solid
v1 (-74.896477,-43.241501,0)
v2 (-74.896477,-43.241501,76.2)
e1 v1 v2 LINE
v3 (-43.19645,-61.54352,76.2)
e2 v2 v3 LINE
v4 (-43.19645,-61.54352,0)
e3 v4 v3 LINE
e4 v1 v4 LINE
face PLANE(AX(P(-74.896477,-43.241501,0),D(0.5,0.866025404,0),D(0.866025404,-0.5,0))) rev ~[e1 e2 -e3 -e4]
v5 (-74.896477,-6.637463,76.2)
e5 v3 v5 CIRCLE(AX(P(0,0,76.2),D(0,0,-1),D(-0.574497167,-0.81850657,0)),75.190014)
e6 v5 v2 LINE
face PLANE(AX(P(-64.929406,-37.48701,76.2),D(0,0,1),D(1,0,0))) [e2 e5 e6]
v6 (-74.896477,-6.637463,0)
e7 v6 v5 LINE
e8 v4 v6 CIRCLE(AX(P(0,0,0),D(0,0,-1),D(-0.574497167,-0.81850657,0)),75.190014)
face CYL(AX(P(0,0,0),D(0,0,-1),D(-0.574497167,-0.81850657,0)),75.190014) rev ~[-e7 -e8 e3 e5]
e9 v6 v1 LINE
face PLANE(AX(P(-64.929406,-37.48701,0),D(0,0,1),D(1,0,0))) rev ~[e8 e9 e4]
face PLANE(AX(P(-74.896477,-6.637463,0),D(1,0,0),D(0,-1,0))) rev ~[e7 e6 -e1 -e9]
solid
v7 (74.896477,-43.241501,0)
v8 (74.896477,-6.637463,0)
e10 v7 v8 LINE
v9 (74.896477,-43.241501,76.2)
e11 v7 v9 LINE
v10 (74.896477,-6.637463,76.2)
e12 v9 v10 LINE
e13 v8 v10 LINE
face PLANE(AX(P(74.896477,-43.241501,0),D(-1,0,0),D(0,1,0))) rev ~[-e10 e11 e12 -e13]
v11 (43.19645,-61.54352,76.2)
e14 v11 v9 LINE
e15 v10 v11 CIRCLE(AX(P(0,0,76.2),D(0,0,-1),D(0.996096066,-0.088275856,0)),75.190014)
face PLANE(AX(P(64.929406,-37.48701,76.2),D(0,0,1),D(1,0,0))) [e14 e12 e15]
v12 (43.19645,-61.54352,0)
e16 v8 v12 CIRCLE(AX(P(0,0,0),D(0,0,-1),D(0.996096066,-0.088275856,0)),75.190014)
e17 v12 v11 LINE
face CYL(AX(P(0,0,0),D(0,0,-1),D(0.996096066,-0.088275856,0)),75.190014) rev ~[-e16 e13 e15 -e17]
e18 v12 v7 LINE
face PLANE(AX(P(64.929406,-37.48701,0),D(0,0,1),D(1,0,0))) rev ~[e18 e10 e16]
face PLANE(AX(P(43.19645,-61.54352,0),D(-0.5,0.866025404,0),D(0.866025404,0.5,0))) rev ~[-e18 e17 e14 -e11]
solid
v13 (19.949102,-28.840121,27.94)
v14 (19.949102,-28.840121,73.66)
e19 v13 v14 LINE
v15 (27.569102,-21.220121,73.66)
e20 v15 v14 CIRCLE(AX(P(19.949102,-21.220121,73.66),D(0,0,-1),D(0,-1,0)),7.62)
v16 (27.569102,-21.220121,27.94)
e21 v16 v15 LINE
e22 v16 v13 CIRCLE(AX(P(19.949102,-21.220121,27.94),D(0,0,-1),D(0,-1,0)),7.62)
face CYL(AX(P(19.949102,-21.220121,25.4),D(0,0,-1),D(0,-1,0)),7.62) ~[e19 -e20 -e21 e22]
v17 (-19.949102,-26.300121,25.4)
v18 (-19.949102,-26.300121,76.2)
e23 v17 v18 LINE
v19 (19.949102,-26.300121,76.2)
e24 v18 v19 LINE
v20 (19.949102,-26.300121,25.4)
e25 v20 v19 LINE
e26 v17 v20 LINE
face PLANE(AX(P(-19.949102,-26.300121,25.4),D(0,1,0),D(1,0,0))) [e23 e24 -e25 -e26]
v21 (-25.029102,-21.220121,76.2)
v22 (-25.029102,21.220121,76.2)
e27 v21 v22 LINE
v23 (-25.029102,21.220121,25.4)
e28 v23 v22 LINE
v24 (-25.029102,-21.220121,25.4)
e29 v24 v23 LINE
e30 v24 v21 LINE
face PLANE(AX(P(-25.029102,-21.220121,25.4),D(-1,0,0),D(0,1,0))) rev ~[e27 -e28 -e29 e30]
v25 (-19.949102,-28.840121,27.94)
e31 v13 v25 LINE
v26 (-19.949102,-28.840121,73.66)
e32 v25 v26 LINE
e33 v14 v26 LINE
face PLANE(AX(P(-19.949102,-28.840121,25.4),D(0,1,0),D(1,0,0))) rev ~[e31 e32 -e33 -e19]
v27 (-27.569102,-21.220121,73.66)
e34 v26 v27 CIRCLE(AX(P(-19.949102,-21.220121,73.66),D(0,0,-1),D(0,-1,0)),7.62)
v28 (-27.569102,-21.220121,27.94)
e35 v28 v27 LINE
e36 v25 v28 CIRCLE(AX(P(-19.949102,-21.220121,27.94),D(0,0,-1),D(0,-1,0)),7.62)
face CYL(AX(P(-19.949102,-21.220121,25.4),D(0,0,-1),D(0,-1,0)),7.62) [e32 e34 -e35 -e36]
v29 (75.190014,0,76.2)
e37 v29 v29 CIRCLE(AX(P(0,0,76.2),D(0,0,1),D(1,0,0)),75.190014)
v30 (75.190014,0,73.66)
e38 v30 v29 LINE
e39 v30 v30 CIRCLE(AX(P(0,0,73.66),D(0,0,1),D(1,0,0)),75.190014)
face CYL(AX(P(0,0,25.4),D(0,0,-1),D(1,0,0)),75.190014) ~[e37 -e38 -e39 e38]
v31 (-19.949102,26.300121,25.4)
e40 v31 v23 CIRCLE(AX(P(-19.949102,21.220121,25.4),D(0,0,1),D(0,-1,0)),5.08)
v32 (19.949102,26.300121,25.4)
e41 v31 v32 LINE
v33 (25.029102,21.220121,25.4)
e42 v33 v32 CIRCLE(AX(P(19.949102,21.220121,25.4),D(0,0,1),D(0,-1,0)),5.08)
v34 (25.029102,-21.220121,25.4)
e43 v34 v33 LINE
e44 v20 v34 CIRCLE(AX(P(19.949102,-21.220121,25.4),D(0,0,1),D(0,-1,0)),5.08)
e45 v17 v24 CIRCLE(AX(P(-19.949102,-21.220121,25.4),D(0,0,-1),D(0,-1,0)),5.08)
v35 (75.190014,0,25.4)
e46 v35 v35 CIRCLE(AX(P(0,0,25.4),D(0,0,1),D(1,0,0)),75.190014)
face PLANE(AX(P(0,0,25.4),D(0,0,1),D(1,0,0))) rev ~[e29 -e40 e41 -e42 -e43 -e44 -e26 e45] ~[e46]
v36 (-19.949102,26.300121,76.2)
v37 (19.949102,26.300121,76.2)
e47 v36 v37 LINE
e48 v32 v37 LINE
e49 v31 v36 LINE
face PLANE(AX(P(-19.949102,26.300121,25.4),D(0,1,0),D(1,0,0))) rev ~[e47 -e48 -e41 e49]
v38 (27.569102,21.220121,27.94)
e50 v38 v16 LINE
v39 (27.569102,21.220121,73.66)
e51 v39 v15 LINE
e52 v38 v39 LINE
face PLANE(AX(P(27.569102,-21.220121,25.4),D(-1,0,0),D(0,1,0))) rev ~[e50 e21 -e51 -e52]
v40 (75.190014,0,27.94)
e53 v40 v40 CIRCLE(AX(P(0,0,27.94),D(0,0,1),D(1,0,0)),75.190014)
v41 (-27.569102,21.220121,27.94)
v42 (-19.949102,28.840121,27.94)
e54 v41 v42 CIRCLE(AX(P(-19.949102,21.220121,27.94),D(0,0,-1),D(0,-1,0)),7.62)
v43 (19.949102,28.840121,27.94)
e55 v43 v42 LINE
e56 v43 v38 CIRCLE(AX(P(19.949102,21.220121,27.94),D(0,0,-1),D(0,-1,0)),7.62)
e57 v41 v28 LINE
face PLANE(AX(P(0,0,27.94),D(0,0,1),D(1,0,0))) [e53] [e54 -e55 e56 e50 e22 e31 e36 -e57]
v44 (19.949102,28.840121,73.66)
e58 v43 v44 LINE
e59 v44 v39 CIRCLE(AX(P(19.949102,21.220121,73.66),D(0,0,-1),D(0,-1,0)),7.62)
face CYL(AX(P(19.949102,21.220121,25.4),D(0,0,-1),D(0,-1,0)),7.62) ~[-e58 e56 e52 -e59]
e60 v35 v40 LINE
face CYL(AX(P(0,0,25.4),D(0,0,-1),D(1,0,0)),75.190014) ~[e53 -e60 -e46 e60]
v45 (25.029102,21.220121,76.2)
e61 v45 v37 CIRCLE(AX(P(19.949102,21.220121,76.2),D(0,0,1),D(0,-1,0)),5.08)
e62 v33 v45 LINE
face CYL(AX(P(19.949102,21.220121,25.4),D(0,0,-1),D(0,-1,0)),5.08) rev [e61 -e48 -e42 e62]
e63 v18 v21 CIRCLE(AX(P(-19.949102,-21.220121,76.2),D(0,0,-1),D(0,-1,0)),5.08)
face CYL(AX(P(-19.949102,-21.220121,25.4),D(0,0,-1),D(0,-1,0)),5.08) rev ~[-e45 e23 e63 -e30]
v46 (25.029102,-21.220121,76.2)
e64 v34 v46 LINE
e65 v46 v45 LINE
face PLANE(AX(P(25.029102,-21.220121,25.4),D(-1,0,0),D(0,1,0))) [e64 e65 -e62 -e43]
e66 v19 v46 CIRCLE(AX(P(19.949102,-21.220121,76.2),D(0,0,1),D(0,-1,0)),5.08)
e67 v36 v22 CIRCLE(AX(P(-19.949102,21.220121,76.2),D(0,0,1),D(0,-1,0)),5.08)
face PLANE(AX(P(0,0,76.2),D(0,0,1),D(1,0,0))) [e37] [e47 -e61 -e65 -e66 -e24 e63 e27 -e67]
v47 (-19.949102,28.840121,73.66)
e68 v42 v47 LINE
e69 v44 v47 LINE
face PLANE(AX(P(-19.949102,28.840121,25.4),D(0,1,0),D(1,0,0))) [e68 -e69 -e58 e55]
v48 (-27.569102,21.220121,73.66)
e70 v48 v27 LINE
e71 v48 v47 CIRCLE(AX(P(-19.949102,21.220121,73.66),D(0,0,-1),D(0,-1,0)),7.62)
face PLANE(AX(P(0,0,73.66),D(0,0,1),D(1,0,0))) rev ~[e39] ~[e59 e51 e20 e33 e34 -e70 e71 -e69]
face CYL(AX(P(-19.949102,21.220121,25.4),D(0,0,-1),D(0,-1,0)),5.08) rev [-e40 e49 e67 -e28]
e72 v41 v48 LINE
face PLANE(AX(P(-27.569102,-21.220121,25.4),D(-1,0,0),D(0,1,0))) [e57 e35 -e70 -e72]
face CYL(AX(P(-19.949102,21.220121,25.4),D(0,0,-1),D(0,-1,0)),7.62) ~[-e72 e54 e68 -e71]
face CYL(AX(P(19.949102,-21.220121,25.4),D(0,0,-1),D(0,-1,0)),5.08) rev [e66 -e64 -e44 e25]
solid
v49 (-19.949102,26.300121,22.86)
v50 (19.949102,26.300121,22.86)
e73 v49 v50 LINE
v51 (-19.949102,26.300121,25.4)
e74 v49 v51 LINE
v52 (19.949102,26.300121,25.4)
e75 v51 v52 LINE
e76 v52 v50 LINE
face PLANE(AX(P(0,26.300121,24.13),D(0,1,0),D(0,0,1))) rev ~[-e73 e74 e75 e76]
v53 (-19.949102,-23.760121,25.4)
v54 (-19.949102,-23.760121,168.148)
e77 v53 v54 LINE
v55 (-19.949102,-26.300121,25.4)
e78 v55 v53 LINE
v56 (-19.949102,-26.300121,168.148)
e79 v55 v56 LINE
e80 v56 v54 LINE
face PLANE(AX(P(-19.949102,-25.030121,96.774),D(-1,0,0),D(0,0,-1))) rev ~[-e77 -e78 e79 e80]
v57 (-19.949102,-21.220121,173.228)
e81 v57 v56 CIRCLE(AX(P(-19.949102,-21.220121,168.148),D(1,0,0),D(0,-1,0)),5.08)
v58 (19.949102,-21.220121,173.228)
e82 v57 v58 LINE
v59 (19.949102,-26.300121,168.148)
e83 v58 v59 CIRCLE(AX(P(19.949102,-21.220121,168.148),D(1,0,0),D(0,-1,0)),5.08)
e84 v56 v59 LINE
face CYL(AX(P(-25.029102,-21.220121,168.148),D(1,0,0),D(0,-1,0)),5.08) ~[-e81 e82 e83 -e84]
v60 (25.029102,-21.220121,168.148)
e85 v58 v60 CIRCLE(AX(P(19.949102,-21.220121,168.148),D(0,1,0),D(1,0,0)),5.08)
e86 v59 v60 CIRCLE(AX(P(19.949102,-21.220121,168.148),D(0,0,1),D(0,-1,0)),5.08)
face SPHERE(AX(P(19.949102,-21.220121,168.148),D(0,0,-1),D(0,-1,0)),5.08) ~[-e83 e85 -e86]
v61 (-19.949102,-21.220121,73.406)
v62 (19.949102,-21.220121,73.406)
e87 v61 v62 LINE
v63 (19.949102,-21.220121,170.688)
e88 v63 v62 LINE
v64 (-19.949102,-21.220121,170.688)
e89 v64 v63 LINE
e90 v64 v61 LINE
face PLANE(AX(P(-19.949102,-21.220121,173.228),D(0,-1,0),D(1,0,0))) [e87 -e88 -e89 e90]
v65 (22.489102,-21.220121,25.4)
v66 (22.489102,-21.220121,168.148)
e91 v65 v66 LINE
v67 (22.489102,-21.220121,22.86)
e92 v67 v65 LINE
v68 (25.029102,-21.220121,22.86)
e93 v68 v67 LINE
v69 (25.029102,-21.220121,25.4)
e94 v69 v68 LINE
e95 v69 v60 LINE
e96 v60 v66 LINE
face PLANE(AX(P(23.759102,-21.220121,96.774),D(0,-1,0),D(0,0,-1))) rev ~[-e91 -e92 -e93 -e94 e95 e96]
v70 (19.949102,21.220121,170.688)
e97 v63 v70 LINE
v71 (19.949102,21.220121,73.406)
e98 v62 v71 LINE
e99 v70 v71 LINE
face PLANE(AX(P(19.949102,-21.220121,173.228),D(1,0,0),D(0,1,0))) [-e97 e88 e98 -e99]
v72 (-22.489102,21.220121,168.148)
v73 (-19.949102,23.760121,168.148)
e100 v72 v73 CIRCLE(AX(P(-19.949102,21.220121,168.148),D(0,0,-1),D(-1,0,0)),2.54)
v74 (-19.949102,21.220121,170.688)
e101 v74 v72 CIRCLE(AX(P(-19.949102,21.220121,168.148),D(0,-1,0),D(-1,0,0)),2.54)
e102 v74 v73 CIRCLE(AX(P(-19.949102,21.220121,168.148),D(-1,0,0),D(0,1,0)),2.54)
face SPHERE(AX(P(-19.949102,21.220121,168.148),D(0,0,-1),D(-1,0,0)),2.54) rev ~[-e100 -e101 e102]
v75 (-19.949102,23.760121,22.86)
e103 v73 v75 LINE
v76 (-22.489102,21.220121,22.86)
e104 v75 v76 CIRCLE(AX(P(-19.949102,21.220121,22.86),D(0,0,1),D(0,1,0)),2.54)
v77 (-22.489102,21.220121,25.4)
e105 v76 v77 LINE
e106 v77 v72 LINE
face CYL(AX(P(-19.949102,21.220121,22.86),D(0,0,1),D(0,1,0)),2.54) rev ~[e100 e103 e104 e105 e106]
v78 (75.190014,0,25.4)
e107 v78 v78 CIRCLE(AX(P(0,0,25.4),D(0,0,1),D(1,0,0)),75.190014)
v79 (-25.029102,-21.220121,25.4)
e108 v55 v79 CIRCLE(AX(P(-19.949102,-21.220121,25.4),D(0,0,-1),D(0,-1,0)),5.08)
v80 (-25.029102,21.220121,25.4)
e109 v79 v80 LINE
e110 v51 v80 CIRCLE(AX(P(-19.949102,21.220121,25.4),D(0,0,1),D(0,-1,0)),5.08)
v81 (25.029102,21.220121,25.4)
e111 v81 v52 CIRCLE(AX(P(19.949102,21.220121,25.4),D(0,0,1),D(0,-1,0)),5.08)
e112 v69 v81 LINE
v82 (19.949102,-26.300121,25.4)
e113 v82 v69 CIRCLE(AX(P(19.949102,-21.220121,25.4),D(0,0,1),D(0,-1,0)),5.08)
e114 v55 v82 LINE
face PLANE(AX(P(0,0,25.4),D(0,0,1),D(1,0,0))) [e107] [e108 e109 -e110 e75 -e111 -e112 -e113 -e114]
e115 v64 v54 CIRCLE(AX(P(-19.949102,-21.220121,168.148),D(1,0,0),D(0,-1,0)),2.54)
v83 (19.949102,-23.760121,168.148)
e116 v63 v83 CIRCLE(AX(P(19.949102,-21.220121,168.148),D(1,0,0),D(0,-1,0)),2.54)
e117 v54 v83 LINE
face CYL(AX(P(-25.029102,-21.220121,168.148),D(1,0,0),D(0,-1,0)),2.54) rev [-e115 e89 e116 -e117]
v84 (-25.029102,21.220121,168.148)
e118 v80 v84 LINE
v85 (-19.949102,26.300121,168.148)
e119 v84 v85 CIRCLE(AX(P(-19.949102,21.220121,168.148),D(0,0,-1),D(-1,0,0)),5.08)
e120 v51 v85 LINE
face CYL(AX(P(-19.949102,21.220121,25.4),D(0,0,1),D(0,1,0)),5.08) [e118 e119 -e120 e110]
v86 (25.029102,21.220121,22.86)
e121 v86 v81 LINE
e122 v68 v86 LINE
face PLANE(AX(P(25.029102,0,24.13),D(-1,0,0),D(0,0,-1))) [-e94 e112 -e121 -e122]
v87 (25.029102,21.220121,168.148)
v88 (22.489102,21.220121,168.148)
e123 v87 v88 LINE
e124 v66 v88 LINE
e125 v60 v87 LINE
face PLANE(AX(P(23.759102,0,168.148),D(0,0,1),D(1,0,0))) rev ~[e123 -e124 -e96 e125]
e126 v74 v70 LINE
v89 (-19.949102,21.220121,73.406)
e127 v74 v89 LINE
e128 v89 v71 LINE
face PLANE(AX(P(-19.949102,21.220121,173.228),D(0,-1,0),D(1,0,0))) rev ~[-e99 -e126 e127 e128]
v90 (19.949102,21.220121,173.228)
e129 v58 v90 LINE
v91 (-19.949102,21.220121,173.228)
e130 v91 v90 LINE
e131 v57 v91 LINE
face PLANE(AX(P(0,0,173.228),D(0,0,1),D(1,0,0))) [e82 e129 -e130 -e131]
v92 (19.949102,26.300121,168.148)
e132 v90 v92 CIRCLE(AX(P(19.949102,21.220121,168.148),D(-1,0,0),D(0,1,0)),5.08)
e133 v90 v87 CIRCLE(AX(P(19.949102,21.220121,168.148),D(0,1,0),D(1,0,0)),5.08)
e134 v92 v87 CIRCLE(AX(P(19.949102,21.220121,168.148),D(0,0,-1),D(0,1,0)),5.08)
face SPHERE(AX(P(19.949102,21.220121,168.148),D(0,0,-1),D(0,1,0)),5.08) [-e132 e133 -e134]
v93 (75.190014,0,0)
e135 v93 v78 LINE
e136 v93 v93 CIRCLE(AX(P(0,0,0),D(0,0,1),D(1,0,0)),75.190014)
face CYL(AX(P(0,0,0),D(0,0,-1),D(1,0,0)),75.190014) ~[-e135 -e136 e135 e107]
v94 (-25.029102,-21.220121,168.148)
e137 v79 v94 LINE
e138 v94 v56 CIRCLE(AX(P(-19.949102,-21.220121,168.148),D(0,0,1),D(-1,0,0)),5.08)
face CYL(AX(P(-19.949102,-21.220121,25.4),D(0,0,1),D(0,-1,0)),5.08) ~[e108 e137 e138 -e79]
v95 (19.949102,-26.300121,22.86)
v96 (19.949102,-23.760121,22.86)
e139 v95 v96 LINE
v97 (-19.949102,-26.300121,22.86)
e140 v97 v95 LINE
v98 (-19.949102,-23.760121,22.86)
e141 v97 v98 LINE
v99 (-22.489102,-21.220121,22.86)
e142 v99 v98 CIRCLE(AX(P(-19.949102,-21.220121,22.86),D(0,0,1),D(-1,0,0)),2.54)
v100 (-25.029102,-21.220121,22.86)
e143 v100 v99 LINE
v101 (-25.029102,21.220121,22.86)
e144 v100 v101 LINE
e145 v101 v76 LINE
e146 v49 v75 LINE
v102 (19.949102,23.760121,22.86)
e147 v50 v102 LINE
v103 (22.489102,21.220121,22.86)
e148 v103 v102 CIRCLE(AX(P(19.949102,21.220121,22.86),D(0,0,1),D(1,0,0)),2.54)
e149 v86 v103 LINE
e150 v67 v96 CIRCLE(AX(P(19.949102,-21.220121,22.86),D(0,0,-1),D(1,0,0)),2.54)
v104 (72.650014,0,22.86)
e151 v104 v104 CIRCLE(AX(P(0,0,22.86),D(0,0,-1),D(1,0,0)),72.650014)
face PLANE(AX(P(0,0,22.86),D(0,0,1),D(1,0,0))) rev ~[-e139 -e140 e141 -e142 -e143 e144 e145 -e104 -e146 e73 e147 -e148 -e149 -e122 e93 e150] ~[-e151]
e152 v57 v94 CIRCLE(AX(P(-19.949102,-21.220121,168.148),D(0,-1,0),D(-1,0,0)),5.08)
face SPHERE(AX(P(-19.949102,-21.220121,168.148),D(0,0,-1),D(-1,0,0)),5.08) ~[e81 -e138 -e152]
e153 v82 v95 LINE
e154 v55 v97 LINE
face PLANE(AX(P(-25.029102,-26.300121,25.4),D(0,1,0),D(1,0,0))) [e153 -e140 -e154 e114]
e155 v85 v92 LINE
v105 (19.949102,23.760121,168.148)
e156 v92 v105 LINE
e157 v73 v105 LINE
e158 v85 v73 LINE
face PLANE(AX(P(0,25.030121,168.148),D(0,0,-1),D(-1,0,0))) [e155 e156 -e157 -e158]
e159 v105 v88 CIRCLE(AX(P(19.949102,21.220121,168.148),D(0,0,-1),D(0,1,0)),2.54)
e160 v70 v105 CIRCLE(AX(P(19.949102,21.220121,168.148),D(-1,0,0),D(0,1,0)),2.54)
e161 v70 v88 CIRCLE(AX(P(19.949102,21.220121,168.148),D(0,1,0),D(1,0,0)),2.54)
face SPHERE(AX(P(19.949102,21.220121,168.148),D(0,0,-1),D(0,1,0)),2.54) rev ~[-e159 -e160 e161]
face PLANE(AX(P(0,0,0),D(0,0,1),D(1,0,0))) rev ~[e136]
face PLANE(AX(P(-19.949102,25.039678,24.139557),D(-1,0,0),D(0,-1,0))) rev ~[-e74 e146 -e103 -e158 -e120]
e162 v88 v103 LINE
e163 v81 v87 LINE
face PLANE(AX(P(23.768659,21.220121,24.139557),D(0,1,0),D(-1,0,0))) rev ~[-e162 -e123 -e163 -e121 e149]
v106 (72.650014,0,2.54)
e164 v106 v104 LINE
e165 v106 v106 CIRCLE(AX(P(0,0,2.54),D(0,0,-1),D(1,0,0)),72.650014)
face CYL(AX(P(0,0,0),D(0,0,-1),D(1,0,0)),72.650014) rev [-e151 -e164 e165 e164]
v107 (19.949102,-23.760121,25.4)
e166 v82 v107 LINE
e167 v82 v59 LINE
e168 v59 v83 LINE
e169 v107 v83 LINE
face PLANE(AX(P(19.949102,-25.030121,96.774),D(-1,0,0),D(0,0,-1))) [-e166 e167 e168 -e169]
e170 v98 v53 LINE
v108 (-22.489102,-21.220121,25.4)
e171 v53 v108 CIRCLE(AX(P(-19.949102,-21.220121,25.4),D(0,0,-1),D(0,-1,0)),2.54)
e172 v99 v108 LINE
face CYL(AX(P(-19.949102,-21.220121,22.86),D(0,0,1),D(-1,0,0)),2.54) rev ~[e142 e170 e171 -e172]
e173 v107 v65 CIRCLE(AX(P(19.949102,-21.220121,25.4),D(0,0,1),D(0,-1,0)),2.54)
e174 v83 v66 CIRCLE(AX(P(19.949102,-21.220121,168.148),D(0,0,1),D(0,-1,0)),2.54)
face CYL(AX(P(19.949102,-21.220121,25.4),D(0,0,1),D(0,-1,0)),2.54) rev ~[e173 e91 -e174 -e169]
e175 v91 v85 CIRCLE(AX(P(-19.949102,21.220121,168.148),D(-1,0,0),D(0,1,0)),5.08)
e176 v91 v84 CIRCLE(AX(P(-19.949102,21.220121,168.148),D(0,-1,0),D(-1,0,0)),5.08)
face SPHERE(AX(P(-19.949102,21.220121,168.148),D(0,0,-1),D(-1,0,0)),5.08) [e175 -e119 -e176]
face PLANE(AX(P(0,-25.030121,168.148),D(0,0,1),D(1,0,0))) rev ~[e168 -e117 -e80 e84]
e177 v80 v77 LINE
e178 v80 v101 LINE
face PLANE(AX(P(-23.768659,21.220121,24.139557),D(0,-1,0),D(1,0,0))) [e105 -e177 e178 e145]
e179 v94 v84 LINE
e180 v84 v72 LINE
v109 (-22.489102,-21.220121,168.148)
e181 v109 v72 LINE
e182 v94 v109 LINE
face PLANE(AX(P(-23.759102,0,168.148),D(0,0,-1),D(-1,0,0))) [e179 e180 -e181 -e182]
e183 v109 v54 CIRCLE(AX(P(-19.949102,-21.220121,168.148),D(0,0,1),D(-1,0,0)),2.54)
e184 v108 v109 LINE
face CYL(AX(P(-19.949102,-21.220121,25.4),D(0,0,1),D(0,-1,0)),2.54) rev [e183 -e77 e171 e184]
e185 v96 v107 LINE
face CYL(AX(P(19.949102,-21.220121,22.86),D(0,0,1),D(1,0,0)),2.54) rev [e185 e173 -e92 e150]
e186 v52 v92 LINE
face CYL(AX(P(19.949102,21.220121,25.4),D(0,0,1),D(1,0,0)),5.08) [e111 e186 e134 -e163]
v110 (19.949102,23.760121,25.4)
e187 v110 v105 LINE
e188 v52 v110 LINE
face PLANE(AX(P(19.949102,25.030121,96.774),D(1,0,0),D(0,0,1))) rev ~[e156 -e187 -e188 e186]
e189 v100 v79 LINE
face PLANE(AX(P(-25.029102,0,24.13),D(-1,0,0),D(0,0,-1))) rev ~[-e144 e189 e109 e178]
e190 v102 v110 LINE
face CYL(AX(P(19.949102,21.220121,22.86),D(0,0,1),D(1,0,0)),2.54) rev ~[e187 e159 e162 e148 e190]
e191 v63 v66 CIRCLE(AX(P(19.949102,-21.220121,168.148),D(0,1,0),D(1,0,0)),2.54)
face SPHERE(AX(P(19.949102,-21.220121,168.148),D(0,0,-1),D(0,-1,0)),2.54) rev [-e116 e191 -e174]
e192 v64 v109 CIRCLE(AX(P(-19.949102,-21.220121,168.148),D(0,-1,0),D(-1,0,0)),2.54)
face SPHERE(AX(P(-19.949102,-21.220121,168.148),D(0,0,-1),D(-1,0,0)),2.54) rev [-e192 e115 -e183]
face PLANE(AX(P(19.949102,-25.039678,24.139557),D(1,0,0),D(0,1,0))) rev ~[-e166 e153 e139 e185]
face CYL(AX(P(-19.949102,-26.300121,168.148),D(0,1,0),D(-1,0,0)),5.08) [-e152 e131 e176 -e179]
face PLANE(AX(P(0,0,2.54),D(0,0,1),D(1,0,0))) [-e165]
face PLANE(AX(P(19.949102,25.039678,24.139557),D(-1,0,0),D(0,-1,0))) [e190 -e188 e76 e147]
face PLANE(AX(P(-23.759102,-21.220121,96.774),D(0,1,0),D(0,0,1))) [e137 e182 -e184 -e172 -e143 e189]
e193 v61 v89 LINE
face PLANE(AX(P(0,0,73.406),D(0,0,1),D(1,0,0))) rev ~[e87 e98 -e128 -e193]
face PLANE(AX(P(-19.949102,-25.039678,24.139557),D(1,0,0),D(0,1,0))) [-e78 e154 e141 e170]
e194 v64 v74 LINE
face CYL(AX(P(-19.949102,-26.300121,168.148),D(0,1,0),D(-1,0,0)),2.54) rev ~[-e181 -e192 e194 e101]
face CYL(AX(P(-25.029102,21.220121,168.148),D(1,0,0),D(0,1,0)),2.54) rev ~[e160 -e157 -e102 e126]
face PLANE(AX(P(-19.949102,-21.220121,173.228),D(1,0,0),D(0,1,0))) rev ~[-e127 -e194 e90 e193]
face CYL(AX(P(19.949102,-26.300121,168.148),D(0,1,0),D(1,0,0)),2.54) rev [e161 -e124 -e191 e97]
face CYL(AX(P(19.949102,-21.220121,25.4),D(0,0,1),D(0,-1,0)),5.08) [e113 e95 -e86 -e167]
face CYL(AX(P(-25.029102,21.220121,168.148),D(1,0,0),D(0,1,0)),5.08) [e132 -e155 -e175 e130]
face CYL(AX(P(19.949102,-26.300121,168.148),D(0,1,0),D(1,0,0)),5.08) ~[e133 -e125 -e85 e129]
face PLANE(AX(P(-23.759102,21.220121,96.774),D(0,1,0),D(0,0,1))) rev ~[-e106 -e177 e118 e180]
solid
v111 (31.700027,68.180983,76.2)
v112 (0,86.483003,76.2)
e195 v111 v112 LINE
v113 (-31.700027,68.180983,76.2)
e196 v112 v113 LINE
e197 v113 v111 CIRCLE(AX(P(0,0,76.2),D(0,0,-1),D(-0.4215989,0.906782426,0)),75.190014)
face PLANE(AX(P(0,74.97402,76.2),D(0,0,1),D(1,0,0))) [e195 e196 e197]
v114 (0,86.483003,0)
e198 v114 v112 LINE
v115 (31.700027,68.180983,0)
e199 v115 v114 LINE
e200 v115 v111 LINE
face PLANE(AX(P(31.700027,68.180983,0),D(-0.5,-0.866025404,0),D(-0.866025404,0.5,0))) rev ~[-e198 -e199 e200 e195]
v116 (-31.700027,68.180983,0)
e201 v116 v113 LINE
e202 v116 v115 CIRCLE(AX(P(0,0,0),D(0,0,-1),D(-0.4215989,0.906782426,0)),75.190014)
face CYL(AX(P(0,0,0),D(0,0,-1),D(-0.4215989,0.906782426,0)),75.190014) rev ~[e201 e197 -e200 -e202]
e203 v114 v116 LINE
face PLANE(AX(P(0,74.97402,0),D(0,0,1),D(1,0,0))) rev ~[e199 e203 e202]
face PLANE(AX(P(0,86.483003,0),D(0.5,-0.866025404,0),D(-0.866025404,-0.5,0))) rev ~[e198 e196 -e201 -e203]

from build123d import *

# Parameters (mm, degrees)
F2_DEPTH     = 76.2
F0_R         = 75.1900139913
F3_DEPTH     = 25.4
F4_W         = 50.0582046807
F4_H         = 52.6002421975
F5_DEPTH     = 147.828
F6_R         = 5.08
F7_DEPTH     = 50.8
F8_T         = -2.54
F9_T         = 2.54
F9_T4_ANGLE  = 90.000000001
F9_T6_ANGLE  = 90.000000001
F9_T8_ANGLE  = 90.000000001
F9_T10_ANGLE = 90.000000001
F10_DEPTH    = 99.822


# Not quite as in the source:
# - a shell that OpenCascade refuses in one call is made with other operations: the cavity is built on its own and cut out


with BuildPart() as f2:
    # F1 (on face) → F2 (new body)
    with BuildSketch(Plane.XY):
        with BuildLine():
            Line((-74.8964771628, -6.6374628139), (-74.8964771628, -43.2415012513))
            Line((-74.8964771628, -43.2415012513), (-43.1964499949, -61.5435204701))
            ThreePointArc((-43.1964499949, -61.5435204701), (-65.1164622274, -37.5950069956), (-74.8964771628, -6.6374628139))
        make_face()
    extrude(amount=F2_DEPTH)


with BuildPart() as f2b:
    # F1 (on face) → F2, piece 2 (new body)
    with BuildSketch(Plane.XY):
        with BuildLine():
            Line((0, 86.4830025026), (-31.7000271679, 68.1809832839))
            ThreePointArc((-31.7000271679, 68.1809832839), (0, 75.1900139913), (31.7000271679, 68.1809832839))
            Line((31.7000271679, 68.1809832839), (0, 86.4830025026))
        make_face()
    extrude(amount=F2_DEPTH)


with BuildPart() as f2c:
    # F1 (on face) → F2, piece 3 (new body)
    with BuildSketch(Plane.XY):
        with BuildLine():
            ThreePointArc((74.8964771628, -6.6374628139), (65.1164622274, -37.5950069956), (43.1964499949, -61.5435204701))
            Line((43.1964499949, -61.5435204701), (74.8964771628, -43.2415012513))
            Line((74.8964771628, -43.2415012513), (74.8964771628, -6.6374628139))
        make_face()
    extrude(amount=F2_DEPTH)


with BuildPart() as f3:
    # F0 (on Top) → F3 (new body)
    with BuildSketch(Plane.XY):
        Circle(F0_R)
    extrude(amount=F3_DEPTH)

    # F4 (on face) → F5 (join)
    with BuildSketch(Plane.XY.offset(25.4)):
        Rectangle(F4_W, F4_H)
    extrude(amount=F5_DEPTH)

    # F6
    f6_edges = [f3.edges().sort_by_distance(p)[0] for p in [
        (25.029102, -26.300121, 99.314),
        (25.029102, 26.300121, 99.314),
        (-25.029102, 26.300121, 99.314),
        (-25.029102, -26.300121, 99.314),
        (-25.029102, 0, 173.228),
        (0, -26.300121, 173.228),
        (0, 26.300121, 173.228),
        (25.029102, 0, 173.228),
    ]]
    fillet(f6_edges, radius=F6_R)


with BuildPart() as f7:
    # F7 (new): a face of the model
    f7_faces = [f3.part.faces().sort_by_distance(p)[0] for p in [
        (27.1557970912, 0, 25.4),
    ]]
    extrude(f7_faces, amount=F7_DEPTH)

    # F8
    f8_openings = [f7.faces().sort_by_distance(p)[0] for p in [
        (-75.190014, 0, 50.8),
    ]]
    offset(amount=F8_T, openings=f8_openings)


with BuildPart() as f3_1:
    add(f3.part)

    # F9: shell of thickness 2.54, made by hand


with BuildPart() as f9_core1:
    # F9_t2: copy of F3
    add(f3_1.part)

    # the walls: a layer under each face that stays
    f9_faces = [f9_core1.faces().sort_by_distance(p)[0] for p in [
        (-50.1266759942, -50.1266759942, 25.4),
        (23.5412047888, -24.8122235472, 96.774),
        (23.5412047888, 24.8122235472, 96.774),
        (-23.5412047888, -24.8122235472, 96.774),
        (-23.5412047888, 24.8122235472, 96.774),
        (-75.1900139913, 0, 12.7),
        (23.5412047888, 0, 171.7401024484),
        (22.4891023403, -23.7601210988, 171.7401024484),
        (22.4891023403, 23.7601210988, 171.7401024484),
        (0, -24.8122235472, 171.7401024484),
        (0, 24.8122235472, 171.7401024484),
        (-22.4891023403, -23.7601210988, 171.7401024484),
        (-22.4891023403, 23.7601210988, 171.7401024484),
        (-23.5412047888, 0, 171.7401024484),
        (0, 0, 0),
        (0, 0, 173.228),
    ]]
    thicken(f9_faces, amount=-F9_T, mode=Mode.SUBTRACT)

    # F9_s3 → F9_t4 (revolve, cut)
    with BuildSketch(Plane.XZ.offset(21.2201210988)):
        Polygon((25.0545023403, 25.4254), (25.0291023403, 22.86), (22.4891023403, 22.86), (22.4891023403, 25.4), align=None)
    revolve(axis=Axis((19.9491023403, -21.2201210988, 25.4), (0, 0, -1)), revolution_arc=F9_T4_ANGLE, mode=Mode.SUBTRACT)

    # F9_s5 → F9_t6 (revolve, cut)
    with BuildSketch(Plane.XZ.offset(-21.2201210988)):
        Polygon((25.0545023403, 25.4254), (25.0291023403, 22.86), (22.4891023403, 22.86), (22.4891023403, 25.4), align=None)
    revolve(axis=Axis((19.9491023403, 21.2201210988, 25.4), (0, 0, 1)), revolution_arc=F9_T6_ANGLE, mode=Mode.SUBTRACT)

    # F9_s7 → F9_t8 (revolve, cut)
    with BuildSketch(Plane.XZ.offset(21.2201210988)):
        Polygon((-25.0545023403, 25.4254), (-25.0291023403, 22.86), (-22.4891023403, 22.86), (-22.4891023403, 25.4), align=None)
    revolve(axis=Axis((-19.9491023403, -21.2201210988, 25.4), (0, 0, 1)), revolution_arc=F9_T8_ANGLE, mode=Mode.SUBTRACT)

    # F9_s9 → F9_t10 (revolve, cut)
    with BuildSketch(Plane.YZ.offset(-19.9491023403)):
        Polygon((26.3255210988, 25.4254), (26.3001210988, 22.86), (23.7601210988, 22.86), (23.7601210988, 25.4), align=None)
    revolve(axis=Axis((-19.9491023403, 21.2201210988, 25.4), (0, 0, 1)), revolution_arc=F9_T10_ANGLE, mode=Mode.SUBTRACT)


with BuildPart() as f3_2:
    add(f3_1.part)

    # what is left inside the walls is the cavity
    f9_cavity = [f9_core1.part.solids().sort_by_distance(p)[0] for p in [
        (0, -24.216671, 2.5654),
    ]]
    add(f9_cavity, mode=Mode.SUBTRACT)

    # F10 (add): a face of the model
    f10_faces = [f3_2.faces().sort_by_distance(p)[0] for p in [
        (0, 0, 173.228),
    ]]
    extrude(f10_faces, amount=-F10_DEPTH)


solid = Compound([f2.part, f2b.part, f2c.part, f7.part, f3_2.part])
